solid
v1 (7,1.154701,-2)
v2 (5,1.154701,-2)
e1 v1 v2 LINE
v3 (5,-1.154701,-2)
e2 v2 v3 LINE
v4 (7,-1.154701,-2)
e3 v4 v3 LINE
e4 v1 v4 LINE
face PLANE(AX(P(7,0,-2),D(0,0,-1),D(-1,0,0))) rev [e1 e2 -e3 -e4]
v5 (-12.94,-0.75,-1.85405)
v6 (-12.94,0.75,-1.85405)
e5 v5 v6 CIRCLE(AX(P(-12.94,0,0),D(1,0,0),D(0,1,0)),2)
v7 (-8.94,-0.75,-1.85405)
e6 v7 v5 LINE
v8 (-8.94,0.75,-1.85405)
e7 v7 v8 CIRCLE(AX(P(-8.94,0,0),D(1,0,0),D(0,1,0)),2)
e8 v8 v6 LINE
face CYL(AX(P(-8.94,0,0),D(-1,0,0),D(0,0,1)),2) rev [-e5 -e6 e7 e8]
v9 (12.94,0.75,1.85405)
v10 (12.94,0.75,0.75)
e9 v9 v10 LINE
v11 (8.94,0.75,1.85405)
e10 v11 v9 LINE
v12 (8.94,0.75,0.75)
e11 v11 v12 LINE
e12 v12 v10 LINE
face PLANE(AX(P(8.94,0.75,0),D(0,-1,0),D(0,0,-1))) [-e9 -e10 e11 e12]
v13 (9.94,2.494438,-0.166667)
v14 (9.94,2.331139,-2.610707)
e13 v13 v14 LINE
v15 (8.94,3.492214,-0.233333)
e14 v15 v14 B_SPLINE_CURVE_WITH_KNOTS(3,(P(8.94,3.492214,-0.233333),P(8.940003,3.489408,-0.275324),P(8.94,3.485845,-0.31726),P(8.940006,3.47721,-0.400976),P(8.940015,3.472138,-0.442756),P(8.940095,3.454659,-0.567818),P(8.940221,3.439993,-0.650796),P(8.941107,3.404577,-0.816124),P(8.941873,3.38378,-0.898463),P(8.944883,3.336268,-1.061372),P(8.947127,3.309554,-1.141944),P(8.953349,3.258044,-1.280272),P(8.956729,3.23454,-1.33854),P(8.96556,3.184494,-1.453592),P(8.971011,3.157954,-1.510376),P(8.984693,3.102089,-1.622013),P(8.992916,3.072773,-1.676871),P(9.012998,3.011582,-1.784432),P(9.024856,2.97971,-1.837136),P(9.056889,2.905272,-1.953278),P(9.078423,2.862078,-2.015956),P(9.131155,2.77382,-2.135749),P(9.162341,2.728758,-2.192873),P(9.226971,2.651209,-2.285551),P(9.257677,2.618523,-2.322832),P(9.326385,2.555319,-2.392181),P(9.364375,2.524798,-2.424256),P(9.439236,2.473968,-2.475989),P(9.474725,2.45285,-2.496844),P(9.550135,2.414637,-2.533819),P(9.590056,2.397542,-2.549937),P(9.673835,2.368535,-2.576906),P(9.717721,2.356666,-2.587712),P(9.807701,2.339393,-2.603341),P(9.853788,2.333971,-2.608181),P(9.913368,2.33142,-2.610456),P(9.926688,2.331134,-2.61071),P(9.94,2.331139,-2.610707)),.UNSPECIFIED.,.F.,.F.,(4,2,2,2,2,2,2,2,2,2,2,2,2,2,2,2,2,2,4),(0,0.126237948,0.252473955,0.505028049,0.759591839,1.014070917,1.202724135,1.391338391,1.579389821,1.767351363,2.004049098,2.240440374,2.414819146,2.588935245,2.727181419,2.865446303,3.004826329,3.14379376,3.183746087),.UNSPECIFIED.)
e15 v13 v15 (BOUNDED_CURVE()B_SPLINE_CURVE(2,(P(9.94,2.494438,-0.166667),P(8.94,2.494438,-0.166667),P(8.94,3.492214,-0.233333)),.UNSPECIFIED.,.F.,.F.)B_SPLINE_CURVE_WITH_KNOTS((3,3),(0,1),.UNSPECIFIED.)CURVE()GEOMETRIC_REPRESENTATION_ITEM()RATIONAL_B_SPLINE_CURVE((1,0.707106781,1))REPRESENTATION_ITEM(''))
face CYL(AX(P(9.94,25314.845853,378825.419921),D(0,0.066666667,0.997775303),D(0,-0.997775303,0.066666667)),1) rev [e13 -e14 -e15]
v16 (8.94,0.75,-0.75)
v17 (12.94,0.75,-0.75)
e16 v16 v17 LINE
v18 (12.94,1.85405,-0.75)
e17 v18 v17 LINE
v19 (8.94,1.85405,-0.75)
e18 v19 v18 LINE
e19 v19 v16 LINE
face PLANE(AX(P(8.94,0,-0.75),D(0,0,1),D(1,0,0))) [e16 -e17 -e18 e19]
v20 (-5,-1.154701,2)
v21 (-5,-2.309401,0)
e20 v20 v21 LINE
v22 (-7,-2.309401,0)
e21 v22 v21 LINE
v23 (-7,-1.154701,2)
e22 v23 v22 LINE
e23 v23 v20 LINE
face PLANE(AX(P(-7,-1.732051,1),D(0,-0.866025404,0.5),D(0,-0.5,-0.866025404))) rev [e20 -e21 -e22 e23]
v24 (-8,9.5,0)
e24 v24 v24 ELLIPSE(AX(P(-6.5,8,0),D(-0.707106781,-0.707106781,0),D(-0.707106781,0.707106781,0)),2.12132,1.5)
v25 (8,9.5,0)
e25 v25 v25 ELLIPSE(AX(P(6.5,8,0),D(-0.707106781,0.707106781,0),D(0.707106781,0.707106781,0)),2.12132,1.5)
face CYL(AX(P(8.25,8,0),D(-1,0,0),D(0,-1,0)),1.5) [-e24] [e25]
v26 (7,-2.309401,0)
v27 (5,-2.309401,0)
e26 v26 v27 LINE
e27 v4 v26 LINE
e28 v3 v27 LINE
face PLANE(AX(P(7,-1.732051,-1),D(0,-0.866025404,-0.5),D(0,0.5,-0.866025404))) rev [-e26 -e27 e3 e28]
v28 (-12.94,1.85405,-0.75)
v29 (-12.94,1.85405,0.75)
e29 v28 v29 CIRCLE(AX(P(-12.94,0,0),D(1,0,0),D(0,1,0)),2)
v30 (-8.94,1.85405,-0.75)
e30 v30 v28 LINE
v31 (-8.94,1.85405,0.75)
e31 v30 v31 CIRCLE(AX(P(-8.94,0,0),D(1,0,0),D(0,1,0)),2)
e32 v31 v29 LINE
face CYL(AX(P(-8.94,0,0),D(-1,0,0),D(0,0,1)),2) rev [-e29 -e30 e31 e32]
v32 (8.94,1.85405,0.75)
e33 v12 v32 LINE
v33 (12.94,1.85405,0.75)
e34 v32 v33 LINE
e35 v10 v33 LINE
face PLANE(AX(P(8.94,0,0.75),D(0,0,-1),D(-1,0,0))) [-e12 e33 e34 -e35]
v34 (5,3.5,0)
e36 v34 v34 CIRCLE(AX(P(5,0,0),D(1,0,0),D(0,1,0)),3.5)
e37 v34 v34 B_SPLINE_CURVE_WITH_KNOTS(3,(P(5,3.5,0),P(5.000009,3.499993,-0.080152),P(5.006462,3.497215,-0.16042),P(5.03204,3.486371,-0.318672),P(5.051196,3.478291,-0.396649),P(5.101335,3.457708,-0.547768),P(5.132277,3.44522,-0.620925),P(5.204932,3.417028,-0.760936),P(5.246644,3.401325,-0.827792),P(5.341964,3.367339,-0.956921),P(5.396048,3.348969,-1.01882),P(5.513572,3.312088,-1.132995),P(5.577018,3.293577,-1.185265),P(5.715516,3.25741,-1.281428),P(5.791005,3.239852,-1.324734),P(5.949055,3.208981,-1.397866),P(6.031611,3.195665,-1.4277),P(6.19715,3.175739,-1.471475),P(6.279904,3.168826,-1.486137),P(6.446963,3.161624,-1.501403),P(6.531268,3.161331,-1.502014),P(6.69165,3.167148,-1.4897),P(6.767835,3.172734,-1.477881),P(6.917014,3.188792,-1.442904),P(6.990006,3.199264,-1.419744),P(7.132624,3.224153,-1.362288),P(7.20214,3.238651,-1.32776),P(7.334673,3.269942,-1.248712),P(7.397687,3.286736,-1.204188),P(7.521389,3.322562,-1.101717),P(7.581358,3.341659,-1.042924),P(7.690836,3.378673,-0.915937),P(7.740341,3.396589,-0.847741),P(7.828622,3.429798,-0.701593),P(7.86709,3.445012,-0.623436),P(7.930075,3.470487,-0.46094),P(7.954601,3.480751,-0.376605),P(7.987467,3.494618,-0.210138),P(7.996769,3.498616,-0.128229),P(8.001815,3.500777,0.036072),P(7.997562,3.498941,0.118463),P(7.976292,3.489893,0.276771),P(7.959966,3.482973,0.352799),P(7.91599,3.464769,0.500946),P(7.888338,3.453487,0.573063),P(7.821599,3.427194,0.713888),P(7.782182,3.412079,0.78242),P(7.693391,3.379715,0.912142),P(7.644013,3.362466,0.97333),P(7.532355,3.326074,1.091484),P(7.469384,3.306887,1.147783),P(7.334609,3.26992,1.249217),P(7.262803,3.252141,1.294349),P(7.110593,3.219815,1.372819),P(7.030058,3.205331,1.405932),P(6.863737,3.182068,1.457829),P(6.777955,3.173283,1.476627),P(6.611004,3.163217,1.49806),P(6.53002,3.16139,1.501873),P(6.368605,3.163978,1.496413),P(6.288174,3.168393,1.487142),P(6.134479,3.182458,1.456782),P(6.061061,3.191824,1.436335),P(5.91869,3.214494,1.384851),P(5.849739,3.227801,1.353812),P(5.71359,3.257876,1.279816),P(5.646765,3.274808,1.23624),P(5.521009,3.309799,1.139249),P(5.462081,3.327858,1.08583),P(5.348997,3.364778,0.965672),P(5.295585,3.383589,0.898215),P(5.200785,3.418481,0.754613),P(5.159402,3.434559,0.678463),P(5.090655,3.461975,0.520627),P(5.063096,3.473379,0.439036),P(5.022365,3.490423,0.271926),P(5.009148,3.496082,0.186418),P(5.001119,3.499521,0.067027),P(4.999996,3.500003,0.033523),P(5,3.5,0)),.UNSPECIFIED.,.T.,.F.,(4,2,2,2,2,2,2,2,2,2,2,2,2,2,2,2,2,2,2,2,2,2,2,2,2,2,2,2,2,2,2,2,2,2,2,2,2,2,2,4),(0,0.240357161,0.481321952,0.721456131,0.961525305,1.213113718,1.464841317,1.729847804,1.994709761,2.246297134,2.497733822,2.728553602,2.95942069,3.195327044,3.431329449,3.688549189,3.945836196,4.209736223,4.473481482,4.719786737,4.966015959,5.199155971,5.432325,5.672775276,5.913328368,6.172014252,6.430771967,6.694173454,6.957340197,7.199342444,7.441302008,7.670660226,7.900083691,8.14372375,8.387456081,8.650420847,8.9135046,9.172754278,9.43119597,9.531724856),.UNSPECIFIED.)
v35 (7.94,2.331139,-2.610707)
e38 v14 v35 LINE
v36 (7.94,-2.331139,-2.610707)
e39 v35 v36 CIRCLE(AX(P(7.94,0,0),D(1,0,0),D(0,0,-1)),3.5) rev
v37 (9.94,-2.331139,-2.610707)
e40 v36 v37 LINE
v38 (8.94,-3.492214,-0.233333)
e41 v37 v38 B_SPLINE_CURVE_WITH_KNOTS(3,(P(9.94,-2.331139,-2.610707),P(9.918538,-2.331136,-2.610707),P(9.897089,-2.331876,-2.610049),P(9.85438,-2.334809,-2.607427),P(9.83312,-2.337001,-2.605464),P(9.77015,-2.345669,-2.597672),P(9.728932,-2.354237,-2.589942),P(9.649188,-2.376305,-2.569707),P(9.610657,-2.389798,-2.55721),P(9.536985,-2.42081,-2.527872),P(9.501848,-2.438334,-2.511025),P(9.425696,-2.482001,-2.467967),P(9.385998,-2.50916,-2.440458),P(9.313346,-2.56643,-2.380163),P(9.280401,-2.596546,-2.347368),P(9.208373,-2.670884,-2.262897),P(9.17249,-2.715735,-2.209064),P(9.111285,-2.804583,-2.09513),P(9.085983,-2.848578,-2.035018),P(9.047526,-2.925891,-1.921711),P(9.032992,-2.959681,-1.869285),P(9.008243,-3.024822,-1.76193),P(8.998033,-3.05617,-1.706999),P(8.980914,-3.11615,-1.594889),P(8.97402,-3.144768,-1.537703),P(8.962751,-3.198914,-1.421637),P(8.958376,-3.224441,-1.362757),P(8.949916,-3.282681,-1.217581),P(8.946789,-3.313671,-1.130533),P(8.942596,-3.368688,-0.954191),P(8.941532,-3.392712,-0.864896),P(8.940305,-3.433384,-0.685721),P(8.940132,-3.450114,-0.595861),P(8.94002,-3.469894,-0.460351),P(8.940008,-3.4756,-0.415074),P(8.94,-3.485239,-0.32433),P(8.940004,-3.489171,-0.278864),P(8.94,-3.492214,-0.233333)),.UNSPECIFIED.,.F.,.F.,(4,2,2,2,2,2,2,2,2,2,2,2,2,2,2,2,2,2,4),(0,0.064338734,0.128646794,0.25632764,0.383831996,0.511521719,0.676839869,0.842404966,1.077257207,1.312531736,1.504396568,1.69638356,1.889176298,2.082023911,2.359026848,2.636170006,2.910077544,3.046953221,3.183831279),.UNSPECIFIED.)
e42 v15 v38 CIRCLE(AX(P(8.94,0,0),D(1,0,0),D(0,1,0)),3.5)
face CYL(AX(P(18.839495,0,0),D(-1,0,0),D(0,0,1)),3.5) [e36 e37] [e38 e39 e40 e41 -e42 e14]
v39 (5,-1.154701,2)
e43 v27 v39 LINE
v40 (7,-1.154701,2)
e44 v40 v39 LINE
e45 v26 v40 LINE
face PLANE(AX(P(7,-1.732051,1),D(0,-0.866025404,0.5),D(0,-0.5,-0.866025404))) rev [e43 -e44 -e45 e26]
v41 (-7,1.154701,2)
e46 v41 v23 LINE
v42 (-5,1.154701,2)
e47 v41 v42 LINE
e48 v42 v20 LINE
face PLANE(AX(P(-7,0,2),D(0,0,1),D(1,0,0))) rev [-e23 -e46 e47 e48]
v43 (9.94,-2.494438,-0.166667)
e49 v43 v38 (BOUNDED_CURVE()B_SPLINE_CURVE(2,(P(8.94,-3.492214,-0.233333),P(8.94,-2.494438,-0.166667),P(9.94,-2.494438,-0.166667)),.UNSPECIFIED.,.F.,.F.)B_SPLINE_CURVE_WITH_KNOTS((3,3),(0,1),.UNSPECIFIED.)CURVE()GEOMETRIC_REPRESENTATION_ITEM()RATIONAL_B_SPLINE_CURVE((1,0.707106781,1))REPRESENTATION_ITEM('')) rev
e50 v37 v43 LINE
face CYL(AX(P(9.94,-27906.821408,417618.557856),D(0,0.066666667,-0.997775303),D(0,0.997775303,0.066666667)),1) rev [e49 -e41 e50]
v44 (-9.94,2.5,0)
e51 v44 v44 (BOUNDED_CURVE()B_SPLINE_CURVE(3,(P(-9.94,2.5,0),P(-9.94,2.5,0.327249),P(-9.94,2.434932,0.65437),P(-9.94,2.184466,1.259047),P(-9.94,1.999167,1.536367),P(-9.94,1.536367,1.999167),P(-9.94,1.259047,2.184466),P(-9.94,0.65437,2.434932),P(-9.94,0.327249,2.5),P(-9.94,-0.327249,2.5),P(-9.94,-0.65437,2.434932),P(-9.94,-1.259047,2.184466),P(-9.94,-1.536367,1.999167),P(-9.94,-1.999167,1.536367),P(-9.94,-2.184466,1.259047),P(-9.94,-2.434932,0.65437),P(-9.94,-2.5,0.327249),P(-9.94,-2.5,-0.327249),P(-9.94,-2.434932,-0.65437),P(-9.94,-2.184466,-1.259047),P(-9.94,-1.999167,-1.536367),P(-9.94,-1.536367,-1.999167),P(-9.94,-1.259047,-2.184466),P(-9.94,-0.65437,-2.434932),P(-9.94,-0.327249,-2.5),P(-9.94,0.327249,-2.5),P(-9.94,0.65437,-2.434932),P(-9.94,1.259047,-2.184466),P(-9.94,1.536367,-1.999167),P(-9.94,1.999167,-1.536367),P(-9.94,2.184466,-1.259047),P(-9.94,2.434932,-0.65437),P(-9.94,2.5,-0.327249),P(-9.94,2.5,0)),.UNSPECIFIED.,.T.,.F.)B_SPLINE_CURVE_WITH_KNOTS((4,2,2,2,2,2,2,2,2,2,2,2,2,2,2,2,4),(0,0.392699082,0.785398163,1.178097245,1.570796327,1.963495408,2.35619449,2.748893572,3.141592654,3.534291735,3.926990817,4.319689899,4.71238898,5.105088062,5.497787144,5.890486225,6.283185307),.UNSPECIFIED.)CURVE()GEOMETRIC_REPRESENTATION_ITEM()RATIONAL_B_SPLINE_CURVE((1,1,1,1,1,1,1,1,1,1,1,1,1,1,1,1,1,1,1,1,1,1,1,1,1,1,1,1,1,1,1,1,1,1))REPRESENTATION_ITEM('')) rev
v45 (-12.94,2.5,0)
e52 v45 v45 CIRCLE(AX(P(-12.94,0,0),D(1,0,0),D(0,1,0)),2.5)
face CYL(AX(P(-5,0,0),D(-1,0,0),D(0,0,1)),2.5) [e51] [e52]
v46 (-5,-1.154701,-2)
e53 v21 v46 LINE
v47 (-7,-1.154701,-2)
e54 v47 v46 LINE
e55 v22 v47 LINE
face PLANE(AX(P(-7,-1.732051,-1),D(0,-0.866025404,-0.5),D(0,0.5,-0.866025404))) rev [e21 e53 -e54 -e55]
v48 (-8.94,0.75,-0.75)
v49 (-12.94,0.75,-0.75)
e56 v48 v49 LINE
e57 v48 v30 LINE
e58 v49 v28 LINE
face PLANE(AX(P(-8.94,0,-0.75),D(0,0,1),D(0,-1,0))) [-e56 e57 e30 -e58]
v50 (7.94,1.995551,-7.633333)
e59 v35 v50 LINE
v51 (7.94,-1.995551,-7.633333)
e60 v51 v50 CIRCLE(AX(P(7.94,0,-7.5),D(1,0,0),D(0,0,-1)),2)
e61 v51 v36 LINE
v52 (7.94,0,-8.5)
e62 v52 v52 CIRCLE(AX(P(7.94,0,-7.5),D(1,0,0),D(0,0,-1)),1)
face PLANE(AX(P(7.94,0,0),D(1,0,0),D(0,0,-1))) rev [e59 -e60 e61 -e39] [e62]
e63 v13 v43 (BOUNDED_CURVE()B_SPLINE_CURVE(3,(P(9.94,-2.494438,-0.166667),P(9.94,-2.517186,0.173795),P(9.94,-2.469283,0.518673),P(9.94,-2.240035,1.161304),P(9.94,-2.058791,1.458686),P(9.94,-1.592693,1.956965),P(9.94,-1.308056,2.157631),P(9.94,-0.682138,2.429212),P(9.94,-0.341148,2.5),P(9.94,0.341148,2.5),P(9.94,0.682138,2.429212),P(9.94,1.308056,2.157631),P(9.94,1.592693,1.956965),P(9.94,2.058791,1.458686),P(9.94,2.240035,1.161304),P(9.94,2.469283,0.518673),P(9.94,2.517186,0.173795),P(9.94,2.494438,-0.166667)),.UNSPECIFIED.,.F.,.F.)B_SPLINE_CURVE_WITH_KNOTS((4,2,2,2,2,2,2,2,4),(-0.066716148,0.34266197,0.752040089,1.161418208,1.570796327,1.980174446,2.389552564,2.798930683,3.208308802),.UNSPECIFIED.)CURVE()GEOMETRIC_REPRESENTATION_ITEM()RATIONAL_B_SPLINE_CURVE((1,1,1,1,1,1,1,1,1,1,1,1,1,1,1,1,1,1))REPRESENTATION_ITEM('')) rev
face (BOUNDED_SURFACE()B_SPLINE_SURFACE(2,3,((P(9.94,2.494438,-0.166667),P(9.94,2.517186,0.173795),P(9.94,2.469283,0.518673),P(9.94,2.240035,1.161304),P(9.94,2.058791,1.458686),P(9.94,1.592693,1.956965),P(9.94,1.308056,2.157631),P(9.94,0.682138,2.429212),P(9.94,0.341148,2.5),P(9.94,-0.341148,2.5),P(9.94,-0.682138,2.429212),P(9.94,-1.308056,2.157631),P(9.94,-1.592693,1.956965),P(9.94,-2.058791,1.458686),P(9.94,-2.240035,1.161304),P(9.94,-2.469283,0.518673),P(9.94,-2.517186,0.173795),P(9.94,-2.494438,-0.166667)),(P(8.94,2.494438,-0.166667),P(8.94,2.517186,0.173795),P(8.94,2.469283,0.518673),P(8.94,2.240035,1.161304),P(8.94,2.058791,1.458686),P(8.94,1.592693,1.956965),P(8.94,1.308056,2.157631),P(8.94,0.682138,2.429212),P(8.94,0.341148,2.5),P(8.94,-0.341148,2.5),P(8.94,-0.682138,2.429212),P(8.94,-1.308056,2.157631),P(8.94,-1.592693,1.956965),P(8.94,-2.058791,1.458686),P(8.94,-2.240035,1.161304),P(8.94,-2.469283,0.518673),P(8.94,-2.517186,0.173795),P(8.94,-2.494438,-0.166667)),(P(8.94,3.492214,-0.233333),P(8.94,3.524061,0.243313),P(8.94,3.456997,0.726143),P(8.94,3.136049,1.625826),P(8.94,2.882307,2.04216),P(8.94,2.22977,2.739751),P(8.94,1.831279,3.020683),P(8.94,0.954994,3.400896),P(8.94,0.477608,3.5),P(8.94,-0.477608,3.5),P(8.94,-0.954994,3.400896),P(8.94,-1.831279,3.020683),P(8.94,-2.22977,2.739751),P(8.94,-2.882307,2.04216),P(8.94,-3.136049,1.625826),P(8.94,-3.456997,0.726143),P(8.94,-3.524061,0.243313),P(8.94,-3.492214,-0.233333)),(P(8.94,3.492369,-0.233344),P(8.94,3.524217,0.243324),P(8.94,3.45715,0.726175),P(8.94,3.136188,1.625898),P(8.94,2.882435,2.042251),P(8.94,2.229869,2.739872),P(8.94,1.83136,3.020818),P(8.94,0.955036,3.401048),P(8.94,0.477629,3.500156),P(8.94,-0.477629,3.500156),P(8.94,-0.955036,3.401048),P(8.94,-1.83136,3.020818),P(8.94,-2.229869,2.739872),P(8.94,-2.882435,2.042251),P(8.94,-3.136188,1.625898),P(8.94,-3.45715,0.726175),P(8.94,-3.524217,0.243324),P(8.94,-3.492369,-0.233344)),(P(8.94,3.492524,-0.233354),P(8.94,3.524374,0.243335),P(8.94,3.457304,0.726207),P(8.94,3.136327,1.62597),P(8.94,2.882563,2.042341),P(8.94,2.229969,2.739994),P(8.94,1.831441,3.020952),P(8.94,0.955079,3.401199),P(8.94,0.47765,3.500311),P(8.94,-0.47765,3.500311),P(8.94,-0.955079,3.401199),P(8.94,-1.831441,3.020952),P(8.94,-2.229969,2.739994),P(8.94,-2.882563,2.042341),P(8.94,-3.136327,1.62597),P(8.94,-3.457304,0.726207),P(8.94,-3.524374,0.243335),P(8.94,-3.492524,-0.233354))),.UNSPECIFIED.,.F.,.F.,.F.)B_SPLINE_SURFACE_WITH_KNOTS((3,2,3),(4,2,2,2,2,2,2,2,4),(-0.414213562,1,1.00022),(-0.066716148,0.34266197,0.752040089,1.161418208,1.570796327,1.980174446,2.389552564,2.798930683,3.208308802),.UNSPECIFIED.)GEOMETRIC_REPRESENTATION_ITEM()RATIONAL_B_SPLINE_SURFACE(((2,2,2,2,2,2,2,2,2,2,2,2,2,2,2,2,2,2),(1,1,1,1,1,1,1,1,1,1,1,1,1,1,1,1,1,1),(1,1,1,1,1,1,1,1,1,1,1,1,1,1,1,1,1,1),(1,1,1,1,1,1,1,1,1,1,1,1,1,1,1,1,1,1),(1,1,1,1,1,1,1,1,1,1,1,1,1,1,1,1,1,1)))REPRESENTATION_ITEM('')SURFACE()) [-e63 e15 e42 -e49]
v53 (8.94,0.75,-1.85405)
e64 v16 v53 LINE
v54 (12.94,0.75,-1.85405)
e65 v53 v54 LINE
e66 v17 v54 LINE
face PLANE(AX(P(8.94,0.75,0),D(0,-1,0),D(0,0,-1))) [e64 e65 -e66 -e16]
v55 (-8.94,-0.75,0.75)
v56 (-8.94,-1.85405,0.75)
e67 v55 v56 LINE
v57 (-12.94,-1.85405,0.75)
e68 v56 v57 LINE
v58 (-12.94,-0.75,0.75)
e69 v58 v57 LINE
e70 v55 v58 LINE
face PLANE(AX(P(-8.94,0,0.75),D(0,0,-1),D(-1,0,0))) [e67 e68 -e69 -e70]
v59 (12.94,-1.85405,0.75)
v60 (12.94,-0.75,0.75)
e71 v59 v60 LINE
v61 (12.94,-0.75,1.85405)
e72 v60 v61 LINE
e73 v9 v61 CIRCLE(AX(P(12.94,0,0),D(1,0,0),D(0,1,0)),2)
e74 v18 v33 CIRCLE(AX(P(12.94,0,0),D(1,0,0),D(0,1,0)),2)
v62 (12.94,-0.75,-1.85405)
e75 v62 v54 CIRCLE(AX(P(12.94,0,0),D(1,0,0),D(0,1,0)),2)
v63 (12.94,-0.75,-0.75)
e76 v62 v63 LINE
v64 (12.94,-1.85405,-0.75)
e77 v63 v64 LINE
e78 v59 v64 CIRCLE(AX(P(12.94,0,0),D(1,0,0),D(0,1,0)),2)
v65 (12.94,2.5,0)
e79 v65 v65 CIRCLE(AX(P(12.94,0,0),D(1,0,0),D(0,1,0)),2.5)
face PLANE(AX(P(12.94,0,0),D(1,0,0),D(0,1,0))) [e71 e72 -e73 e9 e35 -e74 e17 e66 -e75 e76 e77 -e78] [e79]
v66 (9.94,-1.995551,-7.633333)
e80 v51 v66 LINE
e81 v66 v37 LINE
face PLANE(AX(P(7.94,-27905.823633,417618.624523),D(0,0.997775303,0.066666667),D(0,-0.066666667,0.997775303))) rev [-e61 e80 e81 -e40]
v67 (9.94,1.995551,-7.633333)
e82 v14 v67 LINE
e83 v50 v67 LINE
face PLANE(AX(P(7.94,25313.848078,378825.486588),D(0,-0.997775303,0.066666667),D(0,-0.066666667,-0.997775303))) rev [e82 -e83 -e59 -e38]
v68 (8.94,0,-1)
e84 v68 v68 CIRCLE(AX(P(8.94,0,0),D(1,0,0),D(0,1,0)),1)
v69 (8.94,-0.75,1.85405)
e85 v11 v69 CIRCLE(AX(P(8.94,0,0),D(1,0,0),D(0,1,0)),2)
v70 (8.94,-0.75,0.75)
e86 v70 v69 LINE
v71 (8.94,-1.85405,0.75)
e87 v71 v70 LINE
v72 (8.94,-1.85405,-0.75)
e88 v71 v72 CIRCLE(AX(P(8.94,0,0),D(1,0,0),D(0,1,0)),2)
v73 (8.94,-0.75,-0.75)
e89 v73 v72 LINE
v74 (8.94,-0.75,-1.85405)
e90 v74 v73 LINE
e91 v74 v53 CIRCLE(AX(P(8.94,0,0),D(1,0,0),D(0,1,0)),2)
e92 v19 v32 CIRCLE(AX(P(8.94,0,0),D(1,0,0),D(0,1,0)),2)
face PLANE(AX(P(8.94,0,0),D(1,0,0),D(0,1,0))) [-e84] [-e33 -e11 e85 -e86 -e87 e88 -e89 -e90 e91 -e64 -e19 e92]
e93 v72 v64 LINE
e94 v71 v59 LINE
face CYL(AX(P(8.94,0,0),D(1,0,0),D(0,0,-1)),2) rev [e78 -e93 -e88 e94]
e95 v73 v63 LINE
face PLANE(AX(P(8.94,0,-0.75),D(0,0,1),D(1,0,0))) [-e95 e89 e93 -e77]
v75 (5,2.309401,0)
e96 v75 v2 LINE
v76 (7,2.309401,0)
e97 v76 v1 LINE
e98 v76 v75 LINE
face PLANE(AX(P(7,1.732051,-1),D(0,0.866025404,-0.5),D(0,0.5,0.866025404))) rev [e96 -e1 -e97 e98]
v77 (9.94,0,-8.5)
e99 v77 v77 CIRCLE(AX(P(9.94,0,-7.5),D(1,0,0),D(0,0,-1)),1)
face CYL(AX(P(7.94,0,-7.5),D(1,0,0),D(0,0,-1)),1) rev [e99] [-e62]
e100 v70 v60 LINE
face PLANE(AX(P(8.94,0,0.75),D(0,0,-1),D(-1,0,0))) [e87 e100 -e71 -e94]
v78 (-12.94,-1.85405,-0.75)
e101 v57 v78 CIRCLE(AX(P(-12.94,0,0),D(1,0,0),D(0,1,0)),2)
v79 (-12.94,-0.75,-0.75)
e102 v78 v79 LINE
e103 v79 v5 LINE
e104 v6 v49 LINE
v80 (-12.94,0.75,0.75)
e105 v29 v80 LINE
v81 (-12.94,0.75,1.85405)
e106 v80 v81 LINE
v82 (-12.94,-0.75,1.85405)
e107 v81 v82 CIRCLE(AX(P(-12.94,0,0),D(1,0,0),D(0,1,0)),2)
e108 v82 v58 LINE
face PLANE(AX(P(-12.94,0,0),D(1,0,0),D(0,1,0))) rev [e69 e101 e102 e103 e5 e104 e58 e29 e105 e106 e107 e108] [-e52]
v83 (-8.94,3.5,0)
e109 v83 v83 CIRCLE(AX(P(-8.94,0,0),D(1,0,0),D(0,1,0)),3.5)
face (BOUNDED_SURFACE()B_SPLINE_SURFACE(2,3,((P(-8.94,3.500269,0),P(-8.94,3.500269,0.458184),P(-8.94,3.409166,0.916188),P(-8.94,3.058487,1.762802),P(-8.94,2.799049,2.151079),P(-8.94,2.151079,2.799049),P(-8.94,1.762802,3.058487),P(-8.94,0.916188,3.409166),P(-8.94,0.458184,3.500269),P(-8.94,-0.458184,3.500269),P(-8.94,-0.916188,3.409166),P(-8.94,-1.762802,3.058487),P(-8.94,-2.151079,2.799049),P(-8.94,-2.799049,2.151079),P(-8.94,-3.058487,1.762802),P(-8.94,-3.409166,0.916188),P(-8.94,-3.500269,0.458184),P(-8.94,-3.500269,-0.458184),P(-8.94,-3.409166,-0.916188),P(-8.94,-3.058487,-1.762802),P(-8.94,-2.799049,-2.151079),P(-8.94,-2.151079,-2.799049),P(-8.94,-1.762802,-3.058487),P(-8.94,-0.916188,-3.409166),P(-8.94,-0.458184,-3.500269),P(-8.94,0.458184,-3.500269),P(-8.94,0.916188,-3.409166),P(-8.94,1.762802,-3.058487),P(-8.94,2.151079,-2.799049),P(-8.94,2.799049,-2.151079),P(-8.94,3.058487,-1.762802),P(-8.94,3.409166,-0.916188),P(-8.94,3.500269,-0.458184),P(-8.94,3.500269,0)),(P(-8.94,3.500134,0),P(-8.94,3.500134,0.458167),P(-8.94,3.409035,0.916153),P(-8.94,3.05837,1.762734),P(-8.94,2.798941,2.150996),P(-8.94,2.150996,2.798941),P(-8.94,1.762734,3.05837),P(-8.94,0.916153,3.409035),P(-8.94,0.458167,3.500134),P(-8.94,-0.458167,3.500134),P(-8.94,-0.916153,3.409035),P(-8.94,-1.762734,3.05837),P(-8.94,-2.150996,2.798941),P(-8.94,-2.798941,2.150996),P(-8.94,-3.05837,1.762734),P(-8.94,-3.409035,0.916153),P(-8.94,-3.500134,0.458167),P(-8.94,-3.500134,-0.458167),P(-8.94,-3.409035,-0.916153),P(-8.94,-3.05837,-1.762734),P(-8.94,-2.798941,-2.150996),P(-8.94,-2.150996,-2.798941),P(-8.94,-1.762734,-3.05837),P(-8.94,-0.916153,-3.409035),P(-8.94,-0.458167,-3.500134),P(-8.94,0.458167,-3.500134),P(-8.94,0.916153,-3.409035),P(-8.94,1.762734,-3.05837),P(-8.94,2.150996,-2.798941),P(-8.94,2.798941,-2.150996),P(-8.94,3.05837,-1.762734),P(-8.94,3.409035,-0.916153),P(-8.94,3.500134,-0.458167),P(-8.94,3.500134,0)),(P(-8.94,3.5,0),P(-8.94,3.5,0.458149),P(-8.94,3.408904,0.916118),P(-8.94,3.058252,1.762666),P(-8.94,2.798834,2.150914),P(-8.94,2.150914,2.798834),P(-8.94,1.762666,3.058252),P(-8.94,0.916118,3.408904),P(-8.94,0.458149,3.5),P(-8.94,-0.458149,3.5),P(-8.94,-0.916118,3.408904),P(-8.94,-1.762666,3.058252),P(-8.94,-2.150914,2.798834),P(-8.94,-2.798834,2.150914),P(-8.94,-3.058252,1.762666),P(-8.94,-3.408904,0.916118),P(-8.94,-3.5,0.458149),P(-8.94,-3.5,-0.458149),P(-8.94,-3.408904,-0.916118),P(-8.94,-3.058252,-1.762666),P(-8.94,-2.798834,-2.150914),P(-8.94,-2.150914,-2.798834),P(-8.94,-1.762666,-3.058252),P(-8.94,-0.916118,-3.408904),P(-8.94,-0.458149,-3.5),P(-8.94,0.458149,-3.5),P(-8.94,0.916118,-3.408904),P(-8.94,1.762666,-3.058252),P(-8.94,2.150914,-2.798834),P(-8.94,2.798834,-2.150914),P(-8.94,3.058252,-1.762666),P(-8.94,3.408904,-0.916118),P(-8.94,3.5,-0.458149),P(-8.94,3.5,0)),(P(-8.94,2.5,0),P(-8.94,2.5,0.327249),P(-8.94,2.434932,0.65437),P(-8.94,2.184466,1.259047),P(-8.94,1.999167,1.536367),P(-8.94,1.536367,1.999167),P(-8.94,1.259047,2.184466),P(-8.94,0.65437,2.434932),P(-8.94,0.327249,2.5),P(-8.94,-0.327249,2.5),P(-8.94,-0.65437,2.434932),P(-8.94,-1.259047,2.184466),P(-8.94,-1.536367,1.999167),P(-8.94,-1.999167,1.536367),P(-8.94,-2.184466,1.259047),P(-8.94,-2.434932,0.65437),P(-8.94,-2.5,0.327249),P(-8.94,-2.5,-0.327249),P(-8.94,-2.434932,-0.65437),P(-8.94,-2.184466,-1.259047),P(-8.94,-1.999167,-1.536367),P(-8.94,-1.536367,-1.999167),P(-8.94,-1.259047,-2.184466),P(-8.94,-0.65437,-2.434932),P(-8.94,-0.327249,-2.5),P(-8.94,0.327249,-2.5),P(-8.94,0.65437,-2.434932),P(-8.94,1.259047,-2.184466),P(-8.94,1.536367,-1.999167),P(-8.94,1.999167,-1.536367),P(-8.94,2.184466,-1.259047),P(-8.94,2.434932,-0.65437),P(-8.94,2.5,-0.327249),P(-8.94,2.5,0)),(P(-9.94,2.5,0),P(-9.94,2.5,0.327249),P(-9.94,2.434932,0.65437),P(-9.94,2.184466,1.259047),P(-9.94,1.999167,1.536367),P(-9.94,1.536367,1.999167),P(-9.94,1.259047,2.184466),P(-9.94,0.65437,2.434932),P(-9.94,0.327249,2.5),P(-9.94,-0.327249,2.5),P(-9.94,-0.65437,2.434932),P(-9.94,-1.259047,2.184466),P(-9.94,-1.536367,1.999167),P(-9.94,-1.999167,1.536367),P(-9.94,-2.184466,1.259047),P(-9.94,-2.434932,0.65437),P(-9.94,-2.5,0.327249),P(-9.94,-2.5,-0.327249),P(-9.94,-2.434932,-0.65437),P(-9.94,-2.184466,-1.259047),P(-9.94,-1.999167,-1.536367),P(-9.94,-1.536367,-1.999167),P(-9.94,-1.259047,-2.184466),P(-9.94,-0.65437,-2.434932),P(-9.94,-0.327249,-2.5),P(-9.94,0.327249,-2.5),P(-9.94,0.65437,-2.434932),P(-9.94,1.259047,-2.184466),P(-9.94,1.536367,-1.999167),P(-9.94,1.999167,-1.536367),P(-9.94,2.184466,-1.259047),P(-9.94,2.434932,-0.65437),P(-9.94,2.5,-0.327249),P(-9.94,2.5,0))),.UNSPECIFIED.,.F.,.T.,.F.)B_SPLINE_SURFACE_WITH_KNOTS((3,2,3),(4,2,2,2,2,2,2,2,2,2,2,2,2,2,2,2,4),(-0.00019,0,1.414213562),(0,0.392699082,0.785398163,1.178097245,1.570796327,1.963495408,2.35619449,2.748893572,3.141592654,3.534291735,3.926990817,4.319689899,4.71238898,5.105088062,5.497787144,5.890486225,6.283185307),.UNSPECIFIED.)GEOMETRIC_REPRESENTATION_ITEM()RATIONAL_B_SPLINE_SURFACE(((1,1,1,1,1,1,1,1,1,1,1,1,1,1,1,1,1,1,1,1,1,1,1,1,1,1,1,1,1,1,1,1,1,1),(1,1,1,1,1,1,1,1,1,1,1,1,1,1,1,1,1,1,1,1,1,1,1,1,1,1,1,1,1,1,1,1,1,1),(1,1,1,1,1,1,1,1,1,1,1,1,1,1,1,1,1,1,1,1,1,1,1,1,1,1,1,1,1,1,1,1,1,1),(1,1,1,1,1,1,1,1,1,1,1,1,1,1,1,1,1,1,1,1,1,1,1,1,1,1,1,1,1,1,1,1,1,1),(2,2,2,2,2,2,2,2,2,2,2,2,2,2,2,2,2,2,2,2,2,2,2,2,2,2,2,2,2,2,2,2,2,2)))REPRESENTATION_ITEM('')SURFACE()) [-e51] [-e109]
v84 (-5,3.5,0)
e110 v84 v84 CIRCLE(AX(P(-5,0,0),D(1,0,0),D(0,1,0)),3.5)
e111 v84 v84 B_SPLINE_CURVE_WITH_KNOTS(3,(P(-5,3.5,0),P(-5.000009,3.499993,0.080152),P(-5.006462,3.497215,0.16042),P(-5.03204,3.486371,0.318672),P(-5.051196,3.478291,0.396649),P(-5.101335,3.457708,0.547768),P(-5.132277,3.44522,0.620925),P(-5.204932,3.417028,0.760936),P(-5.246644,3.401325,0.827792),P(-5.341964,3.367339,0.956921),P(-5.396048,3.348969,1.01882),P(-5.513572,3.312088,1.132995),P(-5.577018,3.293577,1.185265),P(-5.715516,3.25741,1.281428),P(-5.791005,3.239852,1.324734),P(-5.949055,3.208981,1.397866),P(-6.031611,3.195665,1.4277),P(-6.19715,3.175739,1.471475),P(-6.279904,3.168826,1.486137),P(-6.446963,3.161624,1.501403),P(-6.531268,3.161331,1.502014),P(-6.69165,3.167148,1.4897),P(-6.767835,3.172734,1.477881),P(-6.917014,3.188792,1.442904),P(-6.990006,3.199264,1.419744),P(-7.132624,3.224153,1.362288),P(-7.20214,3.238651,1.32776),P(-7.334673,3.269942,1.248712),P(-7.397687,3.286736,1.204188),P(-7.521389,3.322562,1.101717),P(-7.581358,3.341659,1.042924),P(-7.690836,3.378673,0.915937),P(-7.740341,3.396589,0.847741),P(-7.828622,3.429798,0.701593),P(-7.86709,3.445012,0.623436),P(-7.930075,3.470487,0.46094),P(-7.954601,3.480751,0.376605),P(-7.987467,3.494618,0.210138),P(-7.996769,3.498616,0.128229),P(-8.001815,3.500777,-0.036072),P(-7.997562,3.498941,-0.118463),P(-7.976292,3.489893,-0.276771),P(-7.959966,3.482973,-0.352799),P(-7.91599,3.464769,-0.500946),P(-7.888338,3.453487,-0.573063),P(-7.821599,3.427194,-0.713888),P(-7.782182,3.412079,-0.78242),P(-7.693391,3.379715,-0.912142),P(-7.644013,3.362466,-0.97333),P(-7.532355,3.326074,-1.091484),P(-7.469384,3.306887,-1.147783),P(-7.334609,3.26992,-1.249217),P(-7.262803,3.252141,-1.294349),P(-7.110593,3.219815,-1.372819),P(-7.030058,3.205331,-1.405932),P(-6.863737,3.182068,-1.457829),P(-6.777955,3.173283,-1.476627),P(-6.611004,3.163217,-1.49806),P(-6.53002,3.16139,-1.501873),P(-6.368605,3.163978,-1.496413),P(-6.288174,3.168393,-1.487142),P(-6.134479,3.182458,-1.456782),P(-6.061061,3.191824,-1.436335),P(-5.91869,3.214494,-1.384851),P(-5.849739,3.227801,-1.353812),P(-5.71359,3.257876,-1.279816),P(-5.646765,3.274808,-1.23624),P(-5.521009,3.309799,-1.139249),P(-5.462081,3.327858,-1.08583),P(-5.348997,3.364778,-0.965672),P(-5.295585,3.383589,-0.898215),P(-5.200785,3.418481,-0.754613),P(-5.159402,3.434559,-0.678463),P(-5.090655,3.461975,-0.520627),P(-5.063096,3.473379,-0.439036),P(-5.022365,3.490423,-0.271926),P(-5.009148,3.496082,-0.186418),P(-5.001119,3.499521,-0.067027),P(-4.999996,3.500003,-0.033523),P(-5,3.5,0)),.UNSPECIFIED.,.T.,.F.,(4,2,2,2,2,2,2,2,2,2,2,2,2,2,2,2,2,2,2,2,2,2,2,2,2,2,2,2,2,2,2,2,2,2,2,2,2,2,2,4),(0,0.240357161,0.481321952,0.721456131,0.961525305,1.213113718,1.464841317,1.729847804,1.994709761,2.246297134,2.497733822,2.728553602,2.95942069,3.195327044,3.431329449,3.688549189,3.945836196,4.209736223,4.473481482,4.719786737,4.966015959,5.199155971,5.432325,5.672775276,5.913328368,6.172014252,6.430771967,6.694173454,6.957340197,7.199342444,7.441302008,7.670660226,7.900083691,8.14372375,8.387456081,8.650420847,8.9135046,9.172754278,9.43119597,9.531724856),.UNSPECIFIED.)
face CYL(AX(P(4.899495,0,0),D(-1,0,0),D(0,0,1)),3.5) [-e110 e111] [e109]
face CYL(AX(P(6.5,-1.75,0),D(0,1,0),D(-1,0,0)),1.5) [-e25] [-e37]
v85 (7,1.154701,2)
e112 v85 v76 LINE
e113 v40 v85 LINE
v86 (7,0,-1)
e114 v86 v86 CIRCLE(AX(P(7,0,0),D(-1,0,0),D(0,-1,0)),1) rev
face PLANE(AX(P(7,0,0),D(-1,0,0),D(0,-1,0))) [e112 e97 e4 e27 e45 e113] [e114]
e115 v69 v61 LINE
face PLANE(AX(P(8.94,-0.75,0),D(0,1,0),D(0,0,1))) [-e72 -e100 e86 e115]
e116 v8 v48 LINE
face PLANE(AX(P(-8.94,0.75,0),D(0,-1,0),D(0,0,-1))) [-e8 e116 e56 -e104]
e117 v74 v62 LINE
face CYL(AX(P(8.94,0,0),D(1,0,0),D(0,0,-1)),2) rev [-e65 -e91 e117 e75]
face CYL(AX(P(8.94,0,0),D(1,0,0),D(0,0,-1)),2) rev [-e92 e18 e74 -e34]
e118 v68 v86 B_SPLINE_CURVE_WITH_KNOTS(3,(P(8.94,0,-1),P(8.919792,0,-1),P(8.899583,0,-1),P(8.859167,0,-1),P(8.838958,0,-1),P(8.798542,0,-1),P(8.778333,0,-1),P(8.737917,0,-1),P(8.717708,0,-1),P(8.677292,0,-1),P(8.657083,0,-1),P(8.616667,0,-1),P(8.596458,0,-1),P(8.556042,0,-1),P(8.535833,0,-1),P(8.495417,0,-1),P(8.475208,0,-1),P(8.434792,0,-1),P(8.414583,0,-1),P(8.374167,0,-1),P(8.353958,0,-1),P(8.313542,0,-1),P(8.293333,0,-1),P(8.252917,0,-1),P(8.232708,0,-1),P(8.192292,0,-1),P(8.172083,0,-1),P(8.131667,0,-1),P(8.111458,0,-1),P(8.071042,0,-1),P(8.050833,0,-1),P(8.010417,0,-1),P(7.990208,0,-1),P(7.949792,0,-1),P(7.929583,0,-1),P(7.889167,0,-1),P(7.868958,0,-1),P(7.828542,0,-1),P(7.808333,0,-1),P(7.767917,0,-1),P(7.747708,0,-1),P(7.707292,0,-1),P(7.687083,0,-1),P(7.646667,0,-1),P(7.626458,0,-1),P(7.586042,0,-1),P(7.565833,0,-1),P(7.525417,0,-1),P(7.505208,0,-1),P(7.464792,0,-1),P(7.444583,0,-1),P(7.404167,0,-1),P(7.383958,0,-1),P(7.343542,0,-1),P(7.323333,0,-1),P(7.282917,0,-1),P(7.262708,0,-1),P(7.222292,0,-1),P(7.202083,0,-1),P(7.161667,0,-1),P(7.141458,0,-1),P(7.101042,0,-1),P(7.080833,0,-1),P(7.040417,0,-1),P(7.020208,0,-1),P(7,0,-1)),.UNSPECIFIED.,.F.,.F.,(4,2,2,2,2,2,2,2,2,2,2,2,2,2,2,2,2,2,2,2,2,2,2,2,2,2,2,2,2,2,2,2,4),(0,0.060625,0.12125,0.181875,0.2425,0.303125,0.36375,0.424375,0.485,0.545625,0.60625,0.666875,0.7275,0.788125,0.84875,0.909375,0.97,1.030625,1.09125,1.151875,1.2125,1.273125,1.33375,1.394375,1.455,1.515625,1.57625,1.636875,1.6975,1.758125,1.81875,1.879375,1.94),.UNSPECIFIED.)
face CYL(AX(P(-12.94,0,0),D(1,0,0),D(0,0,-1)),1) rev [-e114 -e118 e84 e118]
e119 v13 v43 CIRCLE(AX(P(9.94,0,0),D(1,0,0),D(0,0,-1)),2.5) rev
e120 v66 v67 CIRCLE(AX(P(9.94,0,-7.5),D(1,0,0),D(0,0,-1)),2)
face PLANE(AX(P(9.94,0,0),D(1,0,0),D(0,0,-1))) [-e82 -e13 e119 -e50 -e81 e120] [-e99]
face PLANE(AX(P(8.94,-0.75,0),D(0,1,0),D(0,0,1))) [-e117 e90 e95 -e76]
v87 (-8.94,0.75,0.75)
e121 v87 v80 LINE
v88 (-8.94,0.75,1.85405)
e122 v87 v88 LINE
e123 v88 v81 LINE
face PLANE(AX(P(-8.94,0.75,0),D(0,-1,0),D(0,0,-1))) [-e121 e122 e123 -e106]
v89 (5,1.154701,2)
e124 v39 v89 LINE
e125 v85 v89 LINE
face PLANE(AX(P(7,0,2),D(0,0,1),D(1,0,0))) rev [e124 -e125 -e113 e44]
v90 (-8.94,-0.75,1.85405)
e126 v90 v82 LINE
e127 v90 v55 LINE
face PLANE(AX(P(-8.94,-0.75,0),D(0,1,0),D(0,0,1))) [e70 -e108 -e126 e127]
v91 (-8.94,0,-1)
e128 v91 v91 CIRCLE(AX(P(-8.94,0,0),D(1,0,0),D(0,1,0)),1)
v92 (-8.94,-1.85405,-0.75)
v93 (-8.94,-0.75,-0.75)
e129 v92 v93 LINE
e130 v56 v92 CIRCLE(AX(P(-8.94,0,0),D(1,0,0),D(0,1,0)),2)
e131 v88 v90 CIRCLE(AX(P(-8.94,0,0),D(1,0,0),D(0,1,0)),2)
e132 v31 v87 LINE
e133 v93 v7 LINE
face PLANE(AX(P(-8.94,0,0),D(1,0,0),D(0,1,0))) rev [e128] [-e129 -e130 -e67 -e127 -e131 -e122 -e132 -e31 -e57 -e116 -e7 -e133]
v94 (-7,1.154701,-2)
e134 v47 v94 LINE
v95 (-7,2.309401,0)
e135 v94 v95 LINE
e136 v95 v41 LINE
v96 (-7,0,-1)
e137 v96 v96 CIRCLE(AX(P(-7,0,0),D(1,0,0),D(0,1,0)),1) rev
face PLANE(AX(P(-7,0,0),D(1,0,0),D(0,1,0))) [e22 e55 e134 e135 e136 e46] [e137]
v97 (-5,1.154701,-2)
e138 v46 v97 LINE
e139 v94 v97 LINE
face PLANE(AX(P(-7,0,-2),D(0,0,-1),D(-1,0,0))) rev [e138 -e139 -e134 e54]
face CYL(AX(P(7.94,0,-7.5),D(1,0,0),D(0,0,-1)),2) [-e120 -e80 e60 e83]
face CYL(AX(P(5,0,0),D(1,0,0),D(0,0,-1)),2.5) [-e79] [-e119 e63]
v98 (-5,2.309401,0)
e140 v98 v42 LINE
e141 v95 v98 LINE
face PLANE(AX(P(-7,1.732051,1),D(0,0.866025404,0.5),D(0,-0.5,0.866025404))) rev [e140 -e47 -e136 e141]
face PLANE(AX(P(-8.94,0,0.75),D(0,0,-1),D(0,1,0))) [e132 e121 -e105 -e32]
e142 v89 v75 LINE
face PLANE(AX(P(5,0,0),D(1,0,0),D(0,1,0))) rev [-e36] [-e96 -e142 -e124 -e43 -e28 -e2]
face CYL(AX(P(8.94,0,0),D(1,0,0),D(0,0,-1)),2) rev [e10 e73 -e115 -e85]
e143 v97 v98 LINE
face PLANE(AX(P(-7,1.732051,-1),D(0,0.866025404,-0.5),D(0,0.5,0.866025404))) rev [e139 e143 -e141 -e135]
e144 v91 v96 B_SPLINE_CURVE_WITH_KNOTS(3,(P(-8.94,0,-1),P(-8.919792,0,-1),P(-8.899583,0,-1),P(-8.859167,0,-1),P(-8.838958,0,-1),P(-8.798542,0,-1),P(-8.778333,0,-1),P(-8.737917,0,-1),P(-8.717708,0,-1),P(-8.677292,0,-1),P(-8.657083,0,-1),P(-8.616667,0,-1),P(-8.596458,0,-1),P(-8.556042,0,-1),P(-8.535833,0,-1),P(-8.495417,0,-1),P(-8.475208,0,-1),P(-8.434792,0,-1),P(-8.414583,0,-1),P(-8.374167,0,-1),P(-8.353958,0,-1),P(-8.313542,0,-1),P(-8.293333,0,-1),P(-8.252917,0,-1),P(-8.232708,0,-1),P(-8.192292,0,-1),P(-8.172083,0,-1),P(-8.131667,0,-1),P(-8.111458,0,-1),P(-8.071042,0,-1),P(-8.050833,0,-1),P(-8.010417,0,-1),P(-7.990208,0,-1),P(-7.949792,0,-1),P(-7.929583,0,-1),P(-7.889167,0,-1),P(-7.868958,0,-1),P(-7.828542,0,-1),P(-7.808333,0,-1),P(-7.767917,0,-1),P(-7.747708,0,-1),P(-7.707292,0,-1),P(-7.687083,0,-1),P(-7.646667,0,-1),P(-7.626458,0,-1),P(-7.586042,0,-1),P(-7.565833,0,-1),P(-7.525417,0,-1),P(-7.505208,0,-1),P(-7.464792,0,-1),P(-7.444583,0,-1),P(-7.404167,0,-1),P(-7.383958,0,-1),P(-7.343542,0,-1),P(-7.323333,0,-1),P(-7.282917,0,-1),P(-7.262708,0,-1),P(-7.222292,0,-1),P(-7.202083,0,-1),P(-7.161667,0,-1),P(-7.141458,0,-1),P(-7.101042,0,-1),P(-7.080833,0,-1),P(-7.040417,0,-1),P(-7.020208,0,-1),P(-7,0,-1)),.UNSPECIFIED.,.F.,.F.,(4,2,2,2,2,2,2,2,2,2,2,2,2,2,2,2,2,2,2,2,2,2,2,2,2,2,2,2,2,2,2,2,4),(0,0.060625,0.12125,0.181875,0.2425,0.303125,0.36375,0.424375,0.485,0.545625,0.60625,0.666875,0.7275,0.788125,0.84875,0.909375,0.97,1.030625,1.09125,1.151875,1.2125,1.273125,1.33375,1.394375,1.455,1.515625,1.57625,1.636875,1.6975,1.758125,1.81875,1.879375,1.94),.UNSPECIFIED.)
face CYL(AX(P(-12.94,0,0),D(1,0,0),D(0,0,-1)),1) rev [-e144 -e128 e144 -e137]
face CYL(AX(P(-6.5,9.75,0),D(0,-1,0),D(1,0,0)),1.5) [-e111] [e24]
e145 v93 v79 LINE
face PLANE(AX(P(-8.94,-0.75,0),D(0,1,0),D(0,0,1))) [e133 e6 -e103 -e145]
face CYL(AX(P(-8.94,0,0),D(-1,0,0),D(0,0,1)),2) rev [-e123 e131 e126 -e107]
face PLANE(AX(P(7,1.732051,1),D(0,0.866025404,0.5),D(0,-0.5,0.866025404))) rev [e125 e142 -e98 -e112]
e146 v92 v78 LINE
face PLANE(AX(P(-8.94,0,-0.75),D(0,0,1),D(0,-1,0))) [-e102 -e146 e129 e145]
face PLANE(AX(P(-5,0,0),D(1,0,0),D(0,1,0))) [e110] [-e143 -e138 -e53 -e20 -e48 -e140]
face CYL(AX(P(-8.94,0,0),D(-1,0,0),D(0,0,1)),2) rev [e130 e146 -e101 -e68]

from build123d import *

# Parameters (mm, degrees)
SWEEP_1_PROFILE_R        = 1.5
EXTRUDE_1_DEPTH          = 3.44
EXTRUDE_1_DEPTH_BACK     = 4.5
EXTRUDE_1_START          = 9.5
SKETCH_8_R               = 2.5
EXTRUDE_2_DEPTH          = 4.5
EXTRUDE_2_DEPTH_BACK     = 3.44
EXTRUDE_2_START          = -9.5
SKETCH_9_R               = 2.5
EXTRUDE_START            = 9.94
SKETCH_14_R              = 1
EXTRUDE_3_DEPTH          = 2
CUT_EXTRUDE_START        = 12.94
CUT_EXTRUDE_1_DEPTH      = 4
CUT_EXTRUDE_START_2      = -8.94
CUT_EXTRUDE_2_DEPTH      = 4
SKETCH_16_R              = 0.25
CUT_EXTRUDE_3_DEPTH      = 0.25
CUT_EXTRUDE_START_3      = 8.69
SKETCH_17_R              = 0.25
CUT_EXTRUDE_4_DEPTH      = 0.25
EXTRUDE_START_2          = 5
SKETCH_18_R              = 3.5
EXTRUDE_4_DEPTH          = 3.94
EXTRUDE_START_3          = -8.94
SKETCH_20_R              = 3.5
EXTRUDE_5_DEPTH          = 3.94
CUT_EXTRUDE_6_DEPTH      = 19.653246417
CUT_EXTRUDE_6_DEPTH_BACK = 19.653246417
SKETCH_25_R              = 1
FILLET_1_R               = 1
CUT_EXTRUDE_START_4      = -5
CUT_EXTRUDE_7_DEPTH      = 2
CUT_EXTRUDE_START_5      = 5
CUT_EXTRUDE_8_DEPTH      = 2


with BuildPart() as part:
    # 扫描1: sweep along a path in 草图1
    with BuildLine(Plane.XY) as sweep_1_path:
        Line((9.5, 0), (6.5, 0))
        Line((6.5, 0), (6.5, 8))
        Line((6.5, 8), (-6.5, 8))
        Line((-6.5, 8), (-6.5, 0))
        Line((-6.5, 0), (-9.5, 0))
    # 扫描1 profile (on start of the path) → 扫描1 (sweep)
    with BuildSketch(Plane(origin=(9.5, 0, 0), x_dir=(0, -1, 0), z_dir=(-1, 0, 0))):
        Circle(SWEEP_1_PROFILE_R)
    sweep(path=sweep_1_path.line, transition=Transition.RIGHT)

    # 草图8 → 凸台-拉伸1 (add, two sides: drawn at the far end of the back side and taken through both)
    with BuildSketch(Plane(origin=(0, 0, 0), x_dir=(0, 0, -1), z_dir=(1, 0, 0)).offset(EXTRUDE_1_START - EXTRUDE_1_DEPTH_BACK)):
        with Locations(Location((0, 0, 0), (0, 0, 90))):
            Circle(SKETCH_8_R)
    extrude(amount=EXTRUDE_1_DEPTH + EXTRUDE_1_DEPTH_BACK)

    # 草图9 → 凸台-拉伸2 (add, two sides: drawn at the far end of the back side and taken through both)
    with BuildSketch(Plane(origin=(0, 0, 0), x_dir=(0, 0, -1), z_dir=(1, 0, 0)).offset(EXTRUDE_2_START - EXTRUDE_2_DEPTH_BACK)):
        with Locations(Location((0, 0, 0), (0, 0, 90))):
            Circle(SKETCH_9_R)
    extrude(amount=EXTRUDE_2_DEPTH + EXTRUDE_2_DEPTH_BACK)

    # 草图14 → 凸台-拉伸3 (add)
    with BuildSketch(Plane(origin=(0, 0, 0), x_dir=(0, 0, -1), z_dir=(1, 0, 0)).offset(EXTRUDE_START)):
        with BuildLine():
            Line((0.166666667, 2.494438258), (7.633333333, 1.995550606))
            ThreePointArc((7.633333333, 1.995550606), (9.5, 0), (7.633333333, -1.995550606))
            Line((7.633333333, -1.995550606), (0.166666667, -2.494438258))
            ThreePointArc((0.166666667, -2.494438258), (-2.5, 0), (0.166666667, 2.494438258))
        make_face()
        with Locations((7.5, 0)):
            Circle(SKETCH_14_R, mode=Mode.SUBTRACT)
    extrude(amount=-EXTRUDE_3_DEPTH)

    # 草图10 → 切除-拉伸1 (cut)
    with BuildSketch(Plane(origin=(0, 0, 0), x_dir=(0, 0, -1), z_dir=(1, 0, 0)).offset(CUT_EXTRUDE_START)):
        with BuildLine():
            Line((0.75, 0.75), (1.854049622, 0.75))
            ThreePointArc((1.854049622, 0.75), (2, 0), (1.854049622, -0.75))
            Line((1.854049622, -0.75), (0.75, -0.75))
            Line((0.75, -0.75), (0.75, -1.854049622))
            ThreePointArc((0.75, -1.854049622), (0, -2), (-0.75, -1.854049622))
            Line((-0.75, -1.854049622), (-0.75, -0.75))
            Line((-0.75, -0.75), (-1.854049622, -0.75))
            ThreePointArc((-1.854049622, -0.75), (-2, 0), (-1.854049622, 0.75))
            Line((-1.854049622, 0.75), (-0.75, 0.75))
            Line((-0.75, 0.75), (-0.75, 1.854049622))
            ThreePointArc((-0.75, 1.854049622), (0, 2), (0.75, 1.854049622))
            Line((0.75, 1.854049622), (0.75, 0.75))
        make_face()
    extrude(amount=-CUT_EXTRUDE_1_DEPTH, mode=Mode.SUBTRACT)

    # 草图11 → 切除-拉伸2 (cut)
    with BuildSketch(Plane(origin=(0, 0, 0), x_dir=(0, 0, -1), z_dir=(1, 0, 0)).offset(CUT_EXTRUDE_START_2)):
        with BuildLine():
            Line((0.75, 0.75), (0.75, 1.854049622))
            ThreePointArc((0.75, 1.854049622), (0, 2), (-0.75, 1.854049622))
            Line((-0.75, 1.854049622), (-0.75, 0.75))
            Line((-0.75, 0.75), (-1.854049622, 0.75))
            ThreePointArc((-1.854049622, 0.75), (-2, 0), (-1.854049622, -0.75))
            Line((-1.854049622, -0.75), (-0.75, -0.75))
            Line((-0.75, -0.75), (-0.75, -1.854049622))
            ThreePointArc((-0.75, -1.854049622), (0, -2), (0.75, -1.854049622))
            Line((0.75, -1.854049622), (0.75, -0.75))
            Line((0.75, -0.75), (1.854049622, -0.75))
            ThreePointArc((1.854049622, -0.75), (2, 0), (1.854049622, 0.75))
            Line((1.854049622, 0.75), (0.75, 0.75))
        make_face()
    extrude(amount=-CUT_EXTRUDE_2_DEPTH, mode=Mode.SUBTRACT)

    # 草图16 → 切除-拉伸3 (cut)
    with BuildSketch(Plane(origin=(0, 0, 0), x_dir=(0, 0, -1), z_dir=(1, 0, 0)).offset(CUT_EXTRUDE_START_2)):
        with Locations(Location((0.75, 0, 0), (0, 0, 90))):
            Circle(SKETCH_16_R)
    extrude(amount=CUT_EXTRUDE_3_DEPTH, mode=Mode.SUBTRACT)

    # 草图17 → 切除-拉伸4 (cut)
    with BuildSketch(Plane(origin=(0, 0, 0), x_dir=(0, 0, -1), z_dir=(1, 0, 0)).offset(CUT_EXTRUDE_START_3)):
        with Locations(Location((0.75, 0, 0), (0, 0, 90))):
            Circle(SKETCH_17_R)
    extrude(amount=CUT_EXTRUDE_4_DEPTH, mode=Mode.SUBTRACT)

    # 草图18 → 凸台-拉伸4 (add)
    with BuildSketch(Plane(origin=(0, 0, 0), x_dir=(0, 0, -1), z_dir=(1, 0, 0)).offset(EXTRUDE_START_2)):
        with Locations(Location((0, 0, 0), (0, 0, 90))):
            Circle(SKETCH_18_R)
    extrude(amount=EXTRUDE_4_DEPTH)

    # 草图20 → 凸台-拉伸5 (add)
    with BuildSketch(Plane(origin=(0, 0, 0), x_dir=(0, 0, -1), z_dir=(1, 0, 0)).offset(EXTRUDE_START_3)):
        with Locations(Location((0, 0, 0), (0, 0, 90))):
            Circle(SKETCH_20_R)
    extrude(amount=EXTRUDE_5_DEPTH)

    # 草图25 → 切除-拉伸6 (cut, two sides: drawn at the far end of the back side and taken through both)
    with BuildSketch(Plane(origin=(0, 0, 0), x_dir=(0, 0, -1), z_dir=(1, 0, 0)).offset(-CUT_EXTRUDE_6_DEPTH_BACK)):
        Circle(SKETCH_25_R)
    extrude(amount=CUT_EXTRUDE_6_DEPTH + CUT_EXTRUDE_6_DEPTH_BACK, mode=Mode.SUBTRACT)

    # 圆角1
    # the kernel refuses this fillet: 1 mm, written as the material it adds along each edge
    with BuildSketch(Plane(origin=(-8.94, 0, 0), x_dir=(0, 1, 0), z_dir=(0, 0, 1))) as fillet_1_piece_1:
        with BuildLine():
            CenterArc((2.5 + FILLET_1_R, FILLET_1_R), FILLET_1_R, 180, 90)
            Line((2.5, FILLET_1_R), (2.5, 0))
            Line((2.5, 0), (2.5 + FILLET_1_R, 0))
        make_face()
    revolve(axis=Axis((-8.94, 0, 0), (-1, 0, 0)))
    with BuildSketch(Plane(origin=(8.94, 0, 0), x_dir=(0, 1, 0), z_dir=(0, 0, -1))) as fillet_1_piece_2:
        with BuildLine():
            CenterArc((2.5 + FILLET_1_R, FILLET_1_R), FILLET_1_R, 180, 90)
            Line((2.5 + FILLET_1_R, 0), (2.5, 0))
            Line((2.5, 0), (2.5, FILLET_1_R))
        make_face()
    revolve(axis=Axis((8.94, 0, 0), (1, 0, 0)), revolution_arc=183.822553729)
    with BuildSketch(Plane(origin=(8.94, -2.494438258, -0.166666667), x_dir=(1, 0, 0), z_dir=(0, 0.06666666666666658, -0.9977753031397177))) as fillet_1_piece_3_section:
        with BuildLine():
            CenterArc((FILLET_1_R, FILLET_1_R), FILLET_1_R, 180, 90)
            Line((0, FILLET_1_R), (0, 0))
            Line((0, 0), (FILLET_1_R, 0))
        make_face()
    fillet_1_piece_3 = extrude(amount=4.949489743, mode=Mode.PRIVATE)
    fillet_1_piece_3 = fillet_1_piece_3 & Plane(origin=(9.184299624, 0, 0), x_dir=(0, 1, 0), z_dir=(-1, 0, 0)) * Cylinder(3.5, 14, mode=Mode.PRIVATE)
    add(fillet_1_piece_3)
    with BuildSketch(Plane(origin=(8.94, 2.164472275, -5.105145295), x_dir=(0, 0.9977753031397177, -0.0666666666666666), z_dir=(0, 0.06666666666666658, 0.9977753031397177))) as fillet_1_piece_4_section:
        with BuildLine():
            CenterArc((FILLET_1_R, -FILLET_1_R), FILLET_1_R, 90, 90)
            Line((0, -FILLET_1_R), (0, 0))
            Line((0, 0), (FILLET_1_R, 0))
        make_face()
    fillet_1_piece_4 = extrude(amount=4.949489743, mode=Mode.PRIVATE)
    fillet_1_piece_4 = fillet_1_piece_4 & Plane(origin=(9.184299625, 0, 0), x_dir=(0, 1, 0), z_dir=(-1, 0, 0)) * Cylinder(3.5, 14, mode=Mode.PRIVATE)
    add(fillet_1_piece_4)
    with BuildSketch(Plane(origin=(8.94, 0, 0), x_dir=(0, 0.9977753030864385, -0.06666666746407793), z_dir=(0, -0.06666666746407793, -0.9977753030864385))) as fillet_1_piece_5:
        with BuildLine():
            CenterArc((2.5 + FILLET_1_R, FILLET_1_R), FILLET_1_R, 180, 90)
            Line((2.5, FILLET_1_R), (2.5, 0))
            Line((2.5, 0), (2.5 + FILLET_1_R, 0))
        make_face()
    revolve(axis=Axis((8.94, 0, 0), (1, 0, 0)), revolution_arc=3.822553775)

    # 草图26 → 切除-拉伸7 (cut)
    with BuildSketch(Plane(origin=(0, 0, 0), x_dir=(0, 0, -1), z_dir=(1, 0, 0)).offset(CUT_EXTRUDE_START_4)):
        Polygon((0, -2.309401077), (2, -1.154700538), (2, 1.154700538), (0, 2.309401077), (-2, 1.154700538), (-2, -1.154700538), align=None)
    extrude(amount=-CUT_EXTRUDE_7_DEPTH, mode=Mode.SUBTRACT)

    # 草图27 → 切除-拉伸8 (cut)
    with BuildSketch(Plane(origin=(0, 0, 0), x_dir=(0, 0, -1), z_dir=(1, 0, 0)).offset(CUT_EXTRUDE_START_5)):
        Polygon((0, -2.309401077), (2, -1.154700538), (2, 1.154700538), (0, 2.309401077), (-2, 1.154700538), (-2, -1.154700538), align=None)
    extrude(amount=CUT_EXTRUDE_8_DEPTH, mode=Mode.SUBTRACT)


solid = part.part
